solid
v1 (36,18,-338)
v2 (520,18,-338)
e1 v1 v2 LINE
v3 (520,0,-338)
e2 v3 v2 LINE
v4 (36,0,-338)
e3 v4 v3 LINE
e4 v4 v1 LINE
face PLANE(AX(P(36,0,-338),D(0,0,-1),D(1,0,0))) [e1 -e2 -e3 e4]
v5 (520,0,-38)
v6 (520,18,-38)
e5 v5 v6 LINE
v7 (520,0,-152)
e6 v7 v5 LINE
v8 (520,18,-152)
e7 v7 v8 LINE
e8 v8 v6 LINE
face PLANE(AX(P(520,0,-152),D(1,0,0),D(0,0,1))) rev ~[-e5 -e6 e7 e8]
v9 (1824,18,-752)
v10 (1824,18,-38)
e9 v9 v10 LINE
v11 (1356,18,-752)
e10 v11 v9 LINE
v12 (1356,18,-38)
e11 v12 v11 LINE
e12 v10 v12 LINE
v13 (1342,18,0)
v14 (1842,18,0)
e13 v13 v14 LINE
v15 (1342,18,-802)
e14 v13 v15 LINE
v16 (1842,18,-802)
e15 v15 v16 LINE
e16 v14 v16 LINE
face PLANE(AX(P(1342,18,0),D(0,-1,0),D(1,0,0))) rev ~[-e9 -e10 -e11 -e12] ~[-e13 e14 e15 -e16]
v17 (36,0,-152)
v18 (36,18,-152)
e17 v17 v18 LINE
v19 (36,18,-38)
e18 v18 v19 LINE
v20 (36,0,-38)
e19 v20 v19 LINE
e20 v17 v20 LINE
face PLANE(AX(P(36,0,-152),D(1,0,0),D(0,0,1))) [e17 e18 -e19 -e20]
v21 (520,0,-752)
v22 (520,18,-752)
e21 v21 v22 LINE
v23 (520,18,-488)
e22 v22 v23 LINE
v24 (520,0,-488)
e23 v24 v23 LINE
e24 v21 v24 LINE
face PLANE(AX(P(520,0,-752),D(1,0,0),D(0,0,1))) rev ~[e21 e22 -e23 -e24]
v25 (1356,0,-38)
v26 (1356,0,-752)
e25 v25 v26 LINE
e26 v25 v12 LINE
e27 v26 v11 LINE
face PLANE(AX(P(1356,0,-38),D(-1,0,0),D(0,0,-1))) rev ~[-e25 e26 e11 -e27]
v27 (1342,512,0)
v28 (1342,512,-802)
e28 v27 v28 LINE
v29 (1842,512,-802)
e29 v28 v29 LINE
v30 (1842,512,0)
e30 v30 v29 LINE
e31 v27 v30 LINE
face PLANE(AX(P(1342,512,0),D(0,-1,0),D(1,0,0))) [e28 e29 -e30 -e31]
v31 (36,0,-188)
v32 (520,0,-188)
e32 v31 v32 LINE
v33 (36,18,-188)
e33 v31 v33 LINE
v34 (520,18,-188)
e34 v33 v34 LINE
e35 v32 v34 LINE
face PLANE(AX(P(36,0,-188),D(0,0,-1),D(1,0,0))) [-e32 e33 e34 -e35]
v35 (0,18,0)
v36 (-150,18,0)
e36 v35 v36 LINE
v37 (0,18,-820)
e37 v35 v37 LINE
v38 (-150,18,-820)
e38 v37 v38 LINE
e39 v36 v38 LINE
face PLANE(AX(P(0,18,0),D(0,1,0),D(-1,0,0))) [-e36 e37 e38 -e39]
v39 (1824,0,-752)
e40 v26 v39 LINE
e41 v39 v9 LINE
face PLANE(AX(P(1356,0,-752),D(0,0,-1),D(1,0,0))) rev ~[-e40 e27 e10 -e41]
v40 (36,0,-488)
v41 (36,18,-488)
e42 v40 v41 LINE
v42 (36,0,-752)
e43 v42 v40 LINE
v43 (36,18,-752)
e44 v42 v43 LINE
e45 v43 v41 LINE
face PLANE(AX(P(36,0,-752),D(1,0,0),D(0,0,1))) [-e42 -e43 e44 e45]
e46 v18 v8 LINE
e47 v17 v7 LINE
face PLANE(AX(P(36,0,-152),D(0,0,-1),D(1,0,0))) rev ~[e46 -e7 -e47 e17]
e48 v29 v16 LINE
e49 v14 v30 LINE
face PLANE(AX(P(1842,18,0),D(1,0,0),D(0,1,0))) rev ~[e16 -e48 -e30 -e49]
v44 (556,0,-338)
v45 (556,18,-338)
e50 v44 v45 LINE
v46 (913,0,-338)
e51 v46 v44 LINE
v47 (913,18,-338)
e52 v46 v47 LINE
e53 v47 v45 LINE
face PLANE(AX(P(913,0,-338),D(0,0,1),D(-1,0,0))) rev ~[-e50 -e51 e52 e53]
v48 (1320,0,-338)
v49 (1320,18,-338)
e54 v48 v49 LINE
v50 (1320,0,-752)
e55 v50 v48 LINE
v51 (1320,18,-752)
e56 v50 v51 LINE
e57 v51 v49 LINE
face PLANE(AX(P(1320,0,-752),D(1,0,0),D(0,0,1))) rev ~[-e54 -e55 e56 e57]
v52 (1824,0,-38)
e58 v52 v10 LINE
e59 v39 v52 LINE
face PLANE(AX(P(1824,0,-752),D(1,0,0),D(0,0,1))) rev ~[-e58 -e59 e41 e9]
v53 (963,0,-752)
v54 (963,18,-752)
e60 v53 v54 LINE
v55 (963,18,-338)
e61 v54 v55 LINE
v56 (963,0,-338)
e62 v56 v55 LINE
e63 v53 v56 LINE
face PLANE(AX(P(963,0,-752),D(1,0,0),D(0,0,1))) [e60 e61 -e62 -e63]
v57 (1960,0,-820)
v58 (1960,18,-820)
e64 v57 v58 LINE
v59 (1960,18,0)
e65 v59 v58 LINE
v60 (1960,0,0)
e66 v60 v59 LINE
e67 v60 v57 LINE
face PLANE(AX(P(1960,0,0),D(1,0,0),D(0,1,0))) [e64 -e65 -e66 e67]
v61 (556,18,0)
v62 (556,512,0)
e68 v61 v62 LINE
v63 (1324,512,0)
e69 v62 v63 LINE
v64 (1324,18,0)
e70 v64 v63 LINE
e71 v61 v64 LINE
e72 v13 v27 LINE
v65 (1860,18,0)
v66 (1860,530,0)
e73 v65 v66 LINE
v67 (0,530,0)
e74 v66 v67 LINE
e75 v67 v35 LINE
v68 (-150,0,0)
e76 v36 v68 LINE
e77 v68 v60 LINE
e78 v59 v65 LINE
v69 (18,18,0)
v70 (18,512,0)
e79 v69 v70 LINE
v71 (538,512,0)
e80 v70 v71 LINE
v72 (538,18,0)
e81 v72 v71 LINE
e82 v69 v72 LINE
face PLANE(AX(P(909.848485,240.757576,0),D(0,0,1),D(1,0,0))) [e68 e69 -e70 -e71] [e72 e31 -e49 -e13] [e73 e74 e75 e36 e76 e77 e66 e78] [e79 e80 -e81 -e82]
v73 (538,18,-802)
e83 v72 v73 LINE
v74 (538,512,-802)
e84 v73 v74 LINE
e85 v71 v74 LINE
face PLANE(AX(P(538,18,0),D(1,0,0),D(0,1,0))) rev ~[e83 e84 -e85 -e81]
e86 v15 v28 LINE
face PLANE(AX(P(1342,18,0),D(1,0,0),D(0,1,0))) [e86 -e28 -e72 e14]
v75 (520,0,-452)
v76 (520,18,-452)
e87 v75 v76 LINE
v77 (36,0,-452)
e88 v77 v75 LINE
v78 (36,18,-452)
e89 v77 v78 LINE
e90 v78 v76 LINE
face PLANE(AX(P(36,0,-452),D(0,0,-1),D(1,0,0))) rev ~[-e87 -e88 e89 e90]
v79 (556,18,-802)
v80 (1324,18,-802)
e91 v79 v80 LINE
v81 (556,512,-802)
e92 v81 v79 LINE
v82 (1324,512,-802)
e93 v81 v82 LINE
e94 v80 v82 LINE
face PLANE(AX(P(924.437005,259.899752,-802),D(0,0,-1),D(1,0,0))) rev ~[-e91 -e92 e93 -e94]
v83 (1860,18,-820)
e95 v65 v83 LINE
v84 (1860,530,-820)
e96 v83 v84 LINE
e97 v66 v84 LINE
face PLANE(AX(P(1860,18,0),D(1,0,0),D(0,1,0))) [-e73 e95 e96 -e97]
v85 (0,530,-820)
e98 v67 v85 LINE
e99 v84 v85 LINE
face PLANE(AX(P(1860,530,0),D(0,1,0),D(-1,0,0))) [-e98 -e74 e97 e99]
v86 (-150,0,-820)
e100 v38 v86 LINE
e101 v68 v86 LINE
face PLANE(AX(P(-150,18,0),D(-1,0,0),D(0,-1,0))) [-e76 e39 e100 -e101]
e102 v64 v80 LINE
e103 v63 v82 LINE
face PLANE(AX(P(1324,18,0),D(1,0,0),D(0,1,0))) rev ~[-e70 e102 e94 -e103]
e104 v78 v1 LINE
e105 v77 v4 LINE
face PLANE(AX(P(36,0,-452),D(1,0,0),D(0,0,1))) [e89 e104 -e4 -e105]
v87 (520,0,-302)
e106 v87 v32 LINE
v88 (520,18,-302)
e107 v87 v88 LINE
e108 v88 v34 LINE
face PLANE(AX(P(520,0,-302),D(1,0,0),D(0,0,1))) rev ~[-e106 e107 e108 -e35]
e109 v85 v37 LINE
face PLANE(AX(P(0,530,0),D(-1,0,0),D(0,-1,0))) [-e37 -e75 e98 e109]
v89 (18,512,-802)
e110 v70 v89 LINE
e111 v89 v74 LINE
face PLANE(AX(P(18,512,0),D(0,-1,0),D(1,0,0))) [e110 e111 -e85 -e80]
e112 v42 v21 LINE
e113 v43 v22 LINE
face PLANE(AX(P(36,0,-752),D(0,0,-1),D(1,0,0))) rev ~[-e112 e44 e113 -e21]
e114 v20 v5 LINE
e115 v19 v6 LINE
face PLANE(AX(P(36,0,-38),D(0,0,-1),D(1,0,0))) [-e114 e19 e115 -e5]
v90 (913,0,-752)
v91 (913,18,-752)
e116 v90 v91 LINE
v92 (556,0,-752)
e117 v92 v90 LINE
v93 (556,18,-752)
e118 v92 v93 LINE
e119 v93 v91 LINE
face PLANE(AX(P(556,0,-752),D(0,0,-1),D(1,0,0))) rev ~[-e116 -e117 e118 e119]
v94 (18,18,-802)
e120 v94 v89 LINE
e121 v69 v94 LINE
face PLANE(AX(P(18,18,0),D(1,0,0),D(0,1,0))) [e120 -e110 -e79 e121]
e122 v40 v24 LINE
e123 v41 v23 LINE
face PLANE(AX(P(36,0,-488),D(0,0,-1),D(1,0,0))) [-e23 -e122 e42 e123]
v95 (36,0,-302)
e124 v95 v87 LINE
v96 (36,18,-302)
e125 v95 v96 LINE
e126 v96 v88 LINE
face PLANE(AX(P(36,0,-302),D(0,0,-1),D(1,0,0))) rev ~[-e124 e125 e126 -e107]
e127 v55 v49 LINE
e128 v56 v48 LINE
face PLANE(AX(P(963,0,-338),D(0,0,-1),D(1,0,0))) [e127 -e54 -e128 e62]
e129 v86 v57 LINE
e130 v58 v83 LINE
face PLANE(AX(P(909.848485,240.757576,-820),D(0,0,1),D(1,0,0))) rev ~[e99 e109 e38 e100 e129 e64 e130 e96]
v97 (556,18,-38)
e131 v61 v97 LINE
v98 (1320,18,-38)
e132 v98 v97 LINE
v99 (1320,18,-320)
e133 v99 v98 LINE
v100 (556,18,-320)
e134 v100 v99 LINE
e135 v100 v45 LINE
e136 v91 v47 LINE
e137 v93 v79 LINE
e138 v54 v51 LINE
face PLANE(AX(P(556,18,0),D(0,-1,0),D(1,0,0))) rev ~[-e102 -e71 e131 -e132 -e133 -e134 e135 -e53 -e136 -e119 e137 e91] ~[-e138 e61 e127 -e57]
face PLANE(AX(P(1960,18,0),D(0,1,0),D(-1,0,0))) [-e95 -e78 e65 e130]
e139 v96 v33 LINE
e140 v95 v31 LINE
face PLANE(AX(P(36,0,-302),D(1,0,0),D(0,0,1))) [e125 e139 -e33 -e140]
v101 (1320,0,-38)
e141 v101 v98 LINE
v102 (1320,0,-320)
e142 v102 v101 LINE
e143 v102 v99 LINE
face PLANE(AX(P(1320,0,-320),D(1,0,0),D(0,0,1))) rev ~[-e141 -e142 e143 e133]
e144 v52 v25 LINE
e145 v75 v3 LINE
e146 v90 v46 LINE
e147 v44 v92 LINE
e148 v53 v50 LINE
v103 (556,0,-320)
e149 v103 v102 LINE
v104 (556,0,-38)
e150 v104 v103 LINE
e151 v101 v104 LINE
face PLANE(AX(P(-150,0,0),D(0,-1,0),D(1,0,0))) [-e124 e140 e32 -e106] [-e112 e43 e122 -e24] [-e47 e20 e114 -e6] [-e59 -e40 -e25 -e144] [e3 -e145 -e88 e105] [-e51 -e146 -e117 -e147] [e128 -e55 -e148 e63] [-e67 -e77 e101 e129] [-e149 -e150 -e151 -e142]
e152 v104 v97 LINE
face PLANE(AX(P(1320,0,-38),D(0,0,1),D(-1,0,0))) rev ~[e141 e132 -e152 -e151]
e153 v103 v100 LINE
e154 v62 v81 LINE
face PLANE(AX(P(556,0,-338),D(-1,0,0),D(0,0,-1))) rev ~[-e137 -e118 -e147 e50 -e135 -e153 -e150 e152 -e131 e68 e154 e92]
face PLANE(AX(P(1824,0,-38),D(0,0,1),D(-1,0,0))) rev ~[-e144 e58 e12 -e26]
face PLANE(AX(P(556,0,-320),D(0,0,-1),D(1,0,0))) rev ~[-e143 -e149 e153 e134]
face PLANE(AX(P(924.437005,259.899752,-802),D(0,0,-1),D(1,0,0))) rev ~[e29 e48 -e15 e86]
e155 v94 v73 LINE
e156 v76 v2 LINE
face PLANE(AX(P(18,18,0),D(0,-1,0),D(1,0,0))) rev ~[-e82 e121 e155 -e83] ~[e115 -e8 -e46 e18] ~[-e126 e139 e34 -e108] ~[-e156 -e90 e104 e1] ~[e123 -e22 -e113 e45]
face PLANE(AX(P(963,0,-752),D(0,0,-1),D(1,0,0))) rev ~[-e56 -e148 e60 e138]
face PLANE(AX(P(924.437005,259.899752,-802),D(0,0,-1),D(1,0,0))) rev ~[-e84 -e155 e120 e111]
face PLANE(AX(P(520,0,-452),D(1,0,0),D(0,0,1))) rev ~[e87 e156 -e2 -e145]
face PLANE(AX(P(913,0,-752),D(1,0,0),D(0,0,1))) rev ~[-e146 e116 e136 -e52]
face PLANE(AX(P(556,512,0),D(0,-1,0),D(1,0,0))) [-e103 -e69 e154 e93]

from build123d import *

# Parameters (mm, degrees)
F0_W     = 520
F0_H     = 494
F0_W_2   = 768
F0_W_3   = 500
F1_DEPTH = 820
F2_W     = 484
F2_H     = 114
F2_H_2   = 264
F2_W_2   = 357
F2_H_3   = 414
F3_DEPTH = 50
F4_W     = 1835.1259900331
F4_H     = 504.2004961409
F5_DEPTH = 18


# Not quite as in the source:
# - a feature names something its author has since deleted; it is built from what else it names


with BuildPart() as f1:
    # F0 (on Top) → F1 (new body)
    with BuildSketch(Plane.XY):
        Polygon((-150, 0), (0, 0), (1860, 0), (1960, 0), (1960, 18), (1860, 18), (1860, 530), (0, 530), (0, 18), (-150, 18), align=None)
        with Locations((278, 265)):
            Rectangle(F0_W, F0_H, mode=Mode.SUBTRACT)
        with Locations((940, 265)):
            Rectangle(F0_W_2, F0_H, mode=Mode.SUBTRACT)
        with Locations((1592, 265)):
            Rectangle(F0_W_3, F0_H, mode=Mode.SUBTRACT)
    extrude(amount=-F1_DEPTH)

    # F2 (on face) → F3 (cut)
    with BuildSketch(Plane.XZ):
        with Locations((278, -95)):
            Rectangle(F2_W, F2_H)
        with Locations((278, -245)):
            Rectangle(F2_W, F2_H)
        with Locations((278, -395)):
            Rectangle(F2_W, F2_H)
        with Locations((278, -620)):
            Rectangle(F2_W, F2_H_2)
        Polygon((556, -257.2889821529), (556, -320), (1320, -320), (1320, -38), (913, -38), (556, -38), align=None)
        with Locations((1141.5, -545)):
            Rectangle(F2_W_2, F2_H_3)
        Polygon((1572, -38), (1356, -38), (1356, -752), (1572, -752), (1608, -752), (1824, -752), (1824, -38), (1608, -38), align=None)
        Polygon((913, -338), (556, -338), (556, -407.2889821529), (556, -557.2889821529), (556, -752), (913, -752), align=None)
    extrude(amount=-F3_DEPTH, mode=Mode.SUBTRACT)

    # F4 (on face) → F5 (join)
    with BuildSketch(Plane(origin=(0, 0, -820), x_dir=(1, 0, 0), z_dir=(0, 0, -1))):
        with Locations((924.4370049834, -259.8997519296)):
            Rectangle(F4_W, F4_H)
    extrude(amount=-F5_DEPTH)


solid = f1.part
